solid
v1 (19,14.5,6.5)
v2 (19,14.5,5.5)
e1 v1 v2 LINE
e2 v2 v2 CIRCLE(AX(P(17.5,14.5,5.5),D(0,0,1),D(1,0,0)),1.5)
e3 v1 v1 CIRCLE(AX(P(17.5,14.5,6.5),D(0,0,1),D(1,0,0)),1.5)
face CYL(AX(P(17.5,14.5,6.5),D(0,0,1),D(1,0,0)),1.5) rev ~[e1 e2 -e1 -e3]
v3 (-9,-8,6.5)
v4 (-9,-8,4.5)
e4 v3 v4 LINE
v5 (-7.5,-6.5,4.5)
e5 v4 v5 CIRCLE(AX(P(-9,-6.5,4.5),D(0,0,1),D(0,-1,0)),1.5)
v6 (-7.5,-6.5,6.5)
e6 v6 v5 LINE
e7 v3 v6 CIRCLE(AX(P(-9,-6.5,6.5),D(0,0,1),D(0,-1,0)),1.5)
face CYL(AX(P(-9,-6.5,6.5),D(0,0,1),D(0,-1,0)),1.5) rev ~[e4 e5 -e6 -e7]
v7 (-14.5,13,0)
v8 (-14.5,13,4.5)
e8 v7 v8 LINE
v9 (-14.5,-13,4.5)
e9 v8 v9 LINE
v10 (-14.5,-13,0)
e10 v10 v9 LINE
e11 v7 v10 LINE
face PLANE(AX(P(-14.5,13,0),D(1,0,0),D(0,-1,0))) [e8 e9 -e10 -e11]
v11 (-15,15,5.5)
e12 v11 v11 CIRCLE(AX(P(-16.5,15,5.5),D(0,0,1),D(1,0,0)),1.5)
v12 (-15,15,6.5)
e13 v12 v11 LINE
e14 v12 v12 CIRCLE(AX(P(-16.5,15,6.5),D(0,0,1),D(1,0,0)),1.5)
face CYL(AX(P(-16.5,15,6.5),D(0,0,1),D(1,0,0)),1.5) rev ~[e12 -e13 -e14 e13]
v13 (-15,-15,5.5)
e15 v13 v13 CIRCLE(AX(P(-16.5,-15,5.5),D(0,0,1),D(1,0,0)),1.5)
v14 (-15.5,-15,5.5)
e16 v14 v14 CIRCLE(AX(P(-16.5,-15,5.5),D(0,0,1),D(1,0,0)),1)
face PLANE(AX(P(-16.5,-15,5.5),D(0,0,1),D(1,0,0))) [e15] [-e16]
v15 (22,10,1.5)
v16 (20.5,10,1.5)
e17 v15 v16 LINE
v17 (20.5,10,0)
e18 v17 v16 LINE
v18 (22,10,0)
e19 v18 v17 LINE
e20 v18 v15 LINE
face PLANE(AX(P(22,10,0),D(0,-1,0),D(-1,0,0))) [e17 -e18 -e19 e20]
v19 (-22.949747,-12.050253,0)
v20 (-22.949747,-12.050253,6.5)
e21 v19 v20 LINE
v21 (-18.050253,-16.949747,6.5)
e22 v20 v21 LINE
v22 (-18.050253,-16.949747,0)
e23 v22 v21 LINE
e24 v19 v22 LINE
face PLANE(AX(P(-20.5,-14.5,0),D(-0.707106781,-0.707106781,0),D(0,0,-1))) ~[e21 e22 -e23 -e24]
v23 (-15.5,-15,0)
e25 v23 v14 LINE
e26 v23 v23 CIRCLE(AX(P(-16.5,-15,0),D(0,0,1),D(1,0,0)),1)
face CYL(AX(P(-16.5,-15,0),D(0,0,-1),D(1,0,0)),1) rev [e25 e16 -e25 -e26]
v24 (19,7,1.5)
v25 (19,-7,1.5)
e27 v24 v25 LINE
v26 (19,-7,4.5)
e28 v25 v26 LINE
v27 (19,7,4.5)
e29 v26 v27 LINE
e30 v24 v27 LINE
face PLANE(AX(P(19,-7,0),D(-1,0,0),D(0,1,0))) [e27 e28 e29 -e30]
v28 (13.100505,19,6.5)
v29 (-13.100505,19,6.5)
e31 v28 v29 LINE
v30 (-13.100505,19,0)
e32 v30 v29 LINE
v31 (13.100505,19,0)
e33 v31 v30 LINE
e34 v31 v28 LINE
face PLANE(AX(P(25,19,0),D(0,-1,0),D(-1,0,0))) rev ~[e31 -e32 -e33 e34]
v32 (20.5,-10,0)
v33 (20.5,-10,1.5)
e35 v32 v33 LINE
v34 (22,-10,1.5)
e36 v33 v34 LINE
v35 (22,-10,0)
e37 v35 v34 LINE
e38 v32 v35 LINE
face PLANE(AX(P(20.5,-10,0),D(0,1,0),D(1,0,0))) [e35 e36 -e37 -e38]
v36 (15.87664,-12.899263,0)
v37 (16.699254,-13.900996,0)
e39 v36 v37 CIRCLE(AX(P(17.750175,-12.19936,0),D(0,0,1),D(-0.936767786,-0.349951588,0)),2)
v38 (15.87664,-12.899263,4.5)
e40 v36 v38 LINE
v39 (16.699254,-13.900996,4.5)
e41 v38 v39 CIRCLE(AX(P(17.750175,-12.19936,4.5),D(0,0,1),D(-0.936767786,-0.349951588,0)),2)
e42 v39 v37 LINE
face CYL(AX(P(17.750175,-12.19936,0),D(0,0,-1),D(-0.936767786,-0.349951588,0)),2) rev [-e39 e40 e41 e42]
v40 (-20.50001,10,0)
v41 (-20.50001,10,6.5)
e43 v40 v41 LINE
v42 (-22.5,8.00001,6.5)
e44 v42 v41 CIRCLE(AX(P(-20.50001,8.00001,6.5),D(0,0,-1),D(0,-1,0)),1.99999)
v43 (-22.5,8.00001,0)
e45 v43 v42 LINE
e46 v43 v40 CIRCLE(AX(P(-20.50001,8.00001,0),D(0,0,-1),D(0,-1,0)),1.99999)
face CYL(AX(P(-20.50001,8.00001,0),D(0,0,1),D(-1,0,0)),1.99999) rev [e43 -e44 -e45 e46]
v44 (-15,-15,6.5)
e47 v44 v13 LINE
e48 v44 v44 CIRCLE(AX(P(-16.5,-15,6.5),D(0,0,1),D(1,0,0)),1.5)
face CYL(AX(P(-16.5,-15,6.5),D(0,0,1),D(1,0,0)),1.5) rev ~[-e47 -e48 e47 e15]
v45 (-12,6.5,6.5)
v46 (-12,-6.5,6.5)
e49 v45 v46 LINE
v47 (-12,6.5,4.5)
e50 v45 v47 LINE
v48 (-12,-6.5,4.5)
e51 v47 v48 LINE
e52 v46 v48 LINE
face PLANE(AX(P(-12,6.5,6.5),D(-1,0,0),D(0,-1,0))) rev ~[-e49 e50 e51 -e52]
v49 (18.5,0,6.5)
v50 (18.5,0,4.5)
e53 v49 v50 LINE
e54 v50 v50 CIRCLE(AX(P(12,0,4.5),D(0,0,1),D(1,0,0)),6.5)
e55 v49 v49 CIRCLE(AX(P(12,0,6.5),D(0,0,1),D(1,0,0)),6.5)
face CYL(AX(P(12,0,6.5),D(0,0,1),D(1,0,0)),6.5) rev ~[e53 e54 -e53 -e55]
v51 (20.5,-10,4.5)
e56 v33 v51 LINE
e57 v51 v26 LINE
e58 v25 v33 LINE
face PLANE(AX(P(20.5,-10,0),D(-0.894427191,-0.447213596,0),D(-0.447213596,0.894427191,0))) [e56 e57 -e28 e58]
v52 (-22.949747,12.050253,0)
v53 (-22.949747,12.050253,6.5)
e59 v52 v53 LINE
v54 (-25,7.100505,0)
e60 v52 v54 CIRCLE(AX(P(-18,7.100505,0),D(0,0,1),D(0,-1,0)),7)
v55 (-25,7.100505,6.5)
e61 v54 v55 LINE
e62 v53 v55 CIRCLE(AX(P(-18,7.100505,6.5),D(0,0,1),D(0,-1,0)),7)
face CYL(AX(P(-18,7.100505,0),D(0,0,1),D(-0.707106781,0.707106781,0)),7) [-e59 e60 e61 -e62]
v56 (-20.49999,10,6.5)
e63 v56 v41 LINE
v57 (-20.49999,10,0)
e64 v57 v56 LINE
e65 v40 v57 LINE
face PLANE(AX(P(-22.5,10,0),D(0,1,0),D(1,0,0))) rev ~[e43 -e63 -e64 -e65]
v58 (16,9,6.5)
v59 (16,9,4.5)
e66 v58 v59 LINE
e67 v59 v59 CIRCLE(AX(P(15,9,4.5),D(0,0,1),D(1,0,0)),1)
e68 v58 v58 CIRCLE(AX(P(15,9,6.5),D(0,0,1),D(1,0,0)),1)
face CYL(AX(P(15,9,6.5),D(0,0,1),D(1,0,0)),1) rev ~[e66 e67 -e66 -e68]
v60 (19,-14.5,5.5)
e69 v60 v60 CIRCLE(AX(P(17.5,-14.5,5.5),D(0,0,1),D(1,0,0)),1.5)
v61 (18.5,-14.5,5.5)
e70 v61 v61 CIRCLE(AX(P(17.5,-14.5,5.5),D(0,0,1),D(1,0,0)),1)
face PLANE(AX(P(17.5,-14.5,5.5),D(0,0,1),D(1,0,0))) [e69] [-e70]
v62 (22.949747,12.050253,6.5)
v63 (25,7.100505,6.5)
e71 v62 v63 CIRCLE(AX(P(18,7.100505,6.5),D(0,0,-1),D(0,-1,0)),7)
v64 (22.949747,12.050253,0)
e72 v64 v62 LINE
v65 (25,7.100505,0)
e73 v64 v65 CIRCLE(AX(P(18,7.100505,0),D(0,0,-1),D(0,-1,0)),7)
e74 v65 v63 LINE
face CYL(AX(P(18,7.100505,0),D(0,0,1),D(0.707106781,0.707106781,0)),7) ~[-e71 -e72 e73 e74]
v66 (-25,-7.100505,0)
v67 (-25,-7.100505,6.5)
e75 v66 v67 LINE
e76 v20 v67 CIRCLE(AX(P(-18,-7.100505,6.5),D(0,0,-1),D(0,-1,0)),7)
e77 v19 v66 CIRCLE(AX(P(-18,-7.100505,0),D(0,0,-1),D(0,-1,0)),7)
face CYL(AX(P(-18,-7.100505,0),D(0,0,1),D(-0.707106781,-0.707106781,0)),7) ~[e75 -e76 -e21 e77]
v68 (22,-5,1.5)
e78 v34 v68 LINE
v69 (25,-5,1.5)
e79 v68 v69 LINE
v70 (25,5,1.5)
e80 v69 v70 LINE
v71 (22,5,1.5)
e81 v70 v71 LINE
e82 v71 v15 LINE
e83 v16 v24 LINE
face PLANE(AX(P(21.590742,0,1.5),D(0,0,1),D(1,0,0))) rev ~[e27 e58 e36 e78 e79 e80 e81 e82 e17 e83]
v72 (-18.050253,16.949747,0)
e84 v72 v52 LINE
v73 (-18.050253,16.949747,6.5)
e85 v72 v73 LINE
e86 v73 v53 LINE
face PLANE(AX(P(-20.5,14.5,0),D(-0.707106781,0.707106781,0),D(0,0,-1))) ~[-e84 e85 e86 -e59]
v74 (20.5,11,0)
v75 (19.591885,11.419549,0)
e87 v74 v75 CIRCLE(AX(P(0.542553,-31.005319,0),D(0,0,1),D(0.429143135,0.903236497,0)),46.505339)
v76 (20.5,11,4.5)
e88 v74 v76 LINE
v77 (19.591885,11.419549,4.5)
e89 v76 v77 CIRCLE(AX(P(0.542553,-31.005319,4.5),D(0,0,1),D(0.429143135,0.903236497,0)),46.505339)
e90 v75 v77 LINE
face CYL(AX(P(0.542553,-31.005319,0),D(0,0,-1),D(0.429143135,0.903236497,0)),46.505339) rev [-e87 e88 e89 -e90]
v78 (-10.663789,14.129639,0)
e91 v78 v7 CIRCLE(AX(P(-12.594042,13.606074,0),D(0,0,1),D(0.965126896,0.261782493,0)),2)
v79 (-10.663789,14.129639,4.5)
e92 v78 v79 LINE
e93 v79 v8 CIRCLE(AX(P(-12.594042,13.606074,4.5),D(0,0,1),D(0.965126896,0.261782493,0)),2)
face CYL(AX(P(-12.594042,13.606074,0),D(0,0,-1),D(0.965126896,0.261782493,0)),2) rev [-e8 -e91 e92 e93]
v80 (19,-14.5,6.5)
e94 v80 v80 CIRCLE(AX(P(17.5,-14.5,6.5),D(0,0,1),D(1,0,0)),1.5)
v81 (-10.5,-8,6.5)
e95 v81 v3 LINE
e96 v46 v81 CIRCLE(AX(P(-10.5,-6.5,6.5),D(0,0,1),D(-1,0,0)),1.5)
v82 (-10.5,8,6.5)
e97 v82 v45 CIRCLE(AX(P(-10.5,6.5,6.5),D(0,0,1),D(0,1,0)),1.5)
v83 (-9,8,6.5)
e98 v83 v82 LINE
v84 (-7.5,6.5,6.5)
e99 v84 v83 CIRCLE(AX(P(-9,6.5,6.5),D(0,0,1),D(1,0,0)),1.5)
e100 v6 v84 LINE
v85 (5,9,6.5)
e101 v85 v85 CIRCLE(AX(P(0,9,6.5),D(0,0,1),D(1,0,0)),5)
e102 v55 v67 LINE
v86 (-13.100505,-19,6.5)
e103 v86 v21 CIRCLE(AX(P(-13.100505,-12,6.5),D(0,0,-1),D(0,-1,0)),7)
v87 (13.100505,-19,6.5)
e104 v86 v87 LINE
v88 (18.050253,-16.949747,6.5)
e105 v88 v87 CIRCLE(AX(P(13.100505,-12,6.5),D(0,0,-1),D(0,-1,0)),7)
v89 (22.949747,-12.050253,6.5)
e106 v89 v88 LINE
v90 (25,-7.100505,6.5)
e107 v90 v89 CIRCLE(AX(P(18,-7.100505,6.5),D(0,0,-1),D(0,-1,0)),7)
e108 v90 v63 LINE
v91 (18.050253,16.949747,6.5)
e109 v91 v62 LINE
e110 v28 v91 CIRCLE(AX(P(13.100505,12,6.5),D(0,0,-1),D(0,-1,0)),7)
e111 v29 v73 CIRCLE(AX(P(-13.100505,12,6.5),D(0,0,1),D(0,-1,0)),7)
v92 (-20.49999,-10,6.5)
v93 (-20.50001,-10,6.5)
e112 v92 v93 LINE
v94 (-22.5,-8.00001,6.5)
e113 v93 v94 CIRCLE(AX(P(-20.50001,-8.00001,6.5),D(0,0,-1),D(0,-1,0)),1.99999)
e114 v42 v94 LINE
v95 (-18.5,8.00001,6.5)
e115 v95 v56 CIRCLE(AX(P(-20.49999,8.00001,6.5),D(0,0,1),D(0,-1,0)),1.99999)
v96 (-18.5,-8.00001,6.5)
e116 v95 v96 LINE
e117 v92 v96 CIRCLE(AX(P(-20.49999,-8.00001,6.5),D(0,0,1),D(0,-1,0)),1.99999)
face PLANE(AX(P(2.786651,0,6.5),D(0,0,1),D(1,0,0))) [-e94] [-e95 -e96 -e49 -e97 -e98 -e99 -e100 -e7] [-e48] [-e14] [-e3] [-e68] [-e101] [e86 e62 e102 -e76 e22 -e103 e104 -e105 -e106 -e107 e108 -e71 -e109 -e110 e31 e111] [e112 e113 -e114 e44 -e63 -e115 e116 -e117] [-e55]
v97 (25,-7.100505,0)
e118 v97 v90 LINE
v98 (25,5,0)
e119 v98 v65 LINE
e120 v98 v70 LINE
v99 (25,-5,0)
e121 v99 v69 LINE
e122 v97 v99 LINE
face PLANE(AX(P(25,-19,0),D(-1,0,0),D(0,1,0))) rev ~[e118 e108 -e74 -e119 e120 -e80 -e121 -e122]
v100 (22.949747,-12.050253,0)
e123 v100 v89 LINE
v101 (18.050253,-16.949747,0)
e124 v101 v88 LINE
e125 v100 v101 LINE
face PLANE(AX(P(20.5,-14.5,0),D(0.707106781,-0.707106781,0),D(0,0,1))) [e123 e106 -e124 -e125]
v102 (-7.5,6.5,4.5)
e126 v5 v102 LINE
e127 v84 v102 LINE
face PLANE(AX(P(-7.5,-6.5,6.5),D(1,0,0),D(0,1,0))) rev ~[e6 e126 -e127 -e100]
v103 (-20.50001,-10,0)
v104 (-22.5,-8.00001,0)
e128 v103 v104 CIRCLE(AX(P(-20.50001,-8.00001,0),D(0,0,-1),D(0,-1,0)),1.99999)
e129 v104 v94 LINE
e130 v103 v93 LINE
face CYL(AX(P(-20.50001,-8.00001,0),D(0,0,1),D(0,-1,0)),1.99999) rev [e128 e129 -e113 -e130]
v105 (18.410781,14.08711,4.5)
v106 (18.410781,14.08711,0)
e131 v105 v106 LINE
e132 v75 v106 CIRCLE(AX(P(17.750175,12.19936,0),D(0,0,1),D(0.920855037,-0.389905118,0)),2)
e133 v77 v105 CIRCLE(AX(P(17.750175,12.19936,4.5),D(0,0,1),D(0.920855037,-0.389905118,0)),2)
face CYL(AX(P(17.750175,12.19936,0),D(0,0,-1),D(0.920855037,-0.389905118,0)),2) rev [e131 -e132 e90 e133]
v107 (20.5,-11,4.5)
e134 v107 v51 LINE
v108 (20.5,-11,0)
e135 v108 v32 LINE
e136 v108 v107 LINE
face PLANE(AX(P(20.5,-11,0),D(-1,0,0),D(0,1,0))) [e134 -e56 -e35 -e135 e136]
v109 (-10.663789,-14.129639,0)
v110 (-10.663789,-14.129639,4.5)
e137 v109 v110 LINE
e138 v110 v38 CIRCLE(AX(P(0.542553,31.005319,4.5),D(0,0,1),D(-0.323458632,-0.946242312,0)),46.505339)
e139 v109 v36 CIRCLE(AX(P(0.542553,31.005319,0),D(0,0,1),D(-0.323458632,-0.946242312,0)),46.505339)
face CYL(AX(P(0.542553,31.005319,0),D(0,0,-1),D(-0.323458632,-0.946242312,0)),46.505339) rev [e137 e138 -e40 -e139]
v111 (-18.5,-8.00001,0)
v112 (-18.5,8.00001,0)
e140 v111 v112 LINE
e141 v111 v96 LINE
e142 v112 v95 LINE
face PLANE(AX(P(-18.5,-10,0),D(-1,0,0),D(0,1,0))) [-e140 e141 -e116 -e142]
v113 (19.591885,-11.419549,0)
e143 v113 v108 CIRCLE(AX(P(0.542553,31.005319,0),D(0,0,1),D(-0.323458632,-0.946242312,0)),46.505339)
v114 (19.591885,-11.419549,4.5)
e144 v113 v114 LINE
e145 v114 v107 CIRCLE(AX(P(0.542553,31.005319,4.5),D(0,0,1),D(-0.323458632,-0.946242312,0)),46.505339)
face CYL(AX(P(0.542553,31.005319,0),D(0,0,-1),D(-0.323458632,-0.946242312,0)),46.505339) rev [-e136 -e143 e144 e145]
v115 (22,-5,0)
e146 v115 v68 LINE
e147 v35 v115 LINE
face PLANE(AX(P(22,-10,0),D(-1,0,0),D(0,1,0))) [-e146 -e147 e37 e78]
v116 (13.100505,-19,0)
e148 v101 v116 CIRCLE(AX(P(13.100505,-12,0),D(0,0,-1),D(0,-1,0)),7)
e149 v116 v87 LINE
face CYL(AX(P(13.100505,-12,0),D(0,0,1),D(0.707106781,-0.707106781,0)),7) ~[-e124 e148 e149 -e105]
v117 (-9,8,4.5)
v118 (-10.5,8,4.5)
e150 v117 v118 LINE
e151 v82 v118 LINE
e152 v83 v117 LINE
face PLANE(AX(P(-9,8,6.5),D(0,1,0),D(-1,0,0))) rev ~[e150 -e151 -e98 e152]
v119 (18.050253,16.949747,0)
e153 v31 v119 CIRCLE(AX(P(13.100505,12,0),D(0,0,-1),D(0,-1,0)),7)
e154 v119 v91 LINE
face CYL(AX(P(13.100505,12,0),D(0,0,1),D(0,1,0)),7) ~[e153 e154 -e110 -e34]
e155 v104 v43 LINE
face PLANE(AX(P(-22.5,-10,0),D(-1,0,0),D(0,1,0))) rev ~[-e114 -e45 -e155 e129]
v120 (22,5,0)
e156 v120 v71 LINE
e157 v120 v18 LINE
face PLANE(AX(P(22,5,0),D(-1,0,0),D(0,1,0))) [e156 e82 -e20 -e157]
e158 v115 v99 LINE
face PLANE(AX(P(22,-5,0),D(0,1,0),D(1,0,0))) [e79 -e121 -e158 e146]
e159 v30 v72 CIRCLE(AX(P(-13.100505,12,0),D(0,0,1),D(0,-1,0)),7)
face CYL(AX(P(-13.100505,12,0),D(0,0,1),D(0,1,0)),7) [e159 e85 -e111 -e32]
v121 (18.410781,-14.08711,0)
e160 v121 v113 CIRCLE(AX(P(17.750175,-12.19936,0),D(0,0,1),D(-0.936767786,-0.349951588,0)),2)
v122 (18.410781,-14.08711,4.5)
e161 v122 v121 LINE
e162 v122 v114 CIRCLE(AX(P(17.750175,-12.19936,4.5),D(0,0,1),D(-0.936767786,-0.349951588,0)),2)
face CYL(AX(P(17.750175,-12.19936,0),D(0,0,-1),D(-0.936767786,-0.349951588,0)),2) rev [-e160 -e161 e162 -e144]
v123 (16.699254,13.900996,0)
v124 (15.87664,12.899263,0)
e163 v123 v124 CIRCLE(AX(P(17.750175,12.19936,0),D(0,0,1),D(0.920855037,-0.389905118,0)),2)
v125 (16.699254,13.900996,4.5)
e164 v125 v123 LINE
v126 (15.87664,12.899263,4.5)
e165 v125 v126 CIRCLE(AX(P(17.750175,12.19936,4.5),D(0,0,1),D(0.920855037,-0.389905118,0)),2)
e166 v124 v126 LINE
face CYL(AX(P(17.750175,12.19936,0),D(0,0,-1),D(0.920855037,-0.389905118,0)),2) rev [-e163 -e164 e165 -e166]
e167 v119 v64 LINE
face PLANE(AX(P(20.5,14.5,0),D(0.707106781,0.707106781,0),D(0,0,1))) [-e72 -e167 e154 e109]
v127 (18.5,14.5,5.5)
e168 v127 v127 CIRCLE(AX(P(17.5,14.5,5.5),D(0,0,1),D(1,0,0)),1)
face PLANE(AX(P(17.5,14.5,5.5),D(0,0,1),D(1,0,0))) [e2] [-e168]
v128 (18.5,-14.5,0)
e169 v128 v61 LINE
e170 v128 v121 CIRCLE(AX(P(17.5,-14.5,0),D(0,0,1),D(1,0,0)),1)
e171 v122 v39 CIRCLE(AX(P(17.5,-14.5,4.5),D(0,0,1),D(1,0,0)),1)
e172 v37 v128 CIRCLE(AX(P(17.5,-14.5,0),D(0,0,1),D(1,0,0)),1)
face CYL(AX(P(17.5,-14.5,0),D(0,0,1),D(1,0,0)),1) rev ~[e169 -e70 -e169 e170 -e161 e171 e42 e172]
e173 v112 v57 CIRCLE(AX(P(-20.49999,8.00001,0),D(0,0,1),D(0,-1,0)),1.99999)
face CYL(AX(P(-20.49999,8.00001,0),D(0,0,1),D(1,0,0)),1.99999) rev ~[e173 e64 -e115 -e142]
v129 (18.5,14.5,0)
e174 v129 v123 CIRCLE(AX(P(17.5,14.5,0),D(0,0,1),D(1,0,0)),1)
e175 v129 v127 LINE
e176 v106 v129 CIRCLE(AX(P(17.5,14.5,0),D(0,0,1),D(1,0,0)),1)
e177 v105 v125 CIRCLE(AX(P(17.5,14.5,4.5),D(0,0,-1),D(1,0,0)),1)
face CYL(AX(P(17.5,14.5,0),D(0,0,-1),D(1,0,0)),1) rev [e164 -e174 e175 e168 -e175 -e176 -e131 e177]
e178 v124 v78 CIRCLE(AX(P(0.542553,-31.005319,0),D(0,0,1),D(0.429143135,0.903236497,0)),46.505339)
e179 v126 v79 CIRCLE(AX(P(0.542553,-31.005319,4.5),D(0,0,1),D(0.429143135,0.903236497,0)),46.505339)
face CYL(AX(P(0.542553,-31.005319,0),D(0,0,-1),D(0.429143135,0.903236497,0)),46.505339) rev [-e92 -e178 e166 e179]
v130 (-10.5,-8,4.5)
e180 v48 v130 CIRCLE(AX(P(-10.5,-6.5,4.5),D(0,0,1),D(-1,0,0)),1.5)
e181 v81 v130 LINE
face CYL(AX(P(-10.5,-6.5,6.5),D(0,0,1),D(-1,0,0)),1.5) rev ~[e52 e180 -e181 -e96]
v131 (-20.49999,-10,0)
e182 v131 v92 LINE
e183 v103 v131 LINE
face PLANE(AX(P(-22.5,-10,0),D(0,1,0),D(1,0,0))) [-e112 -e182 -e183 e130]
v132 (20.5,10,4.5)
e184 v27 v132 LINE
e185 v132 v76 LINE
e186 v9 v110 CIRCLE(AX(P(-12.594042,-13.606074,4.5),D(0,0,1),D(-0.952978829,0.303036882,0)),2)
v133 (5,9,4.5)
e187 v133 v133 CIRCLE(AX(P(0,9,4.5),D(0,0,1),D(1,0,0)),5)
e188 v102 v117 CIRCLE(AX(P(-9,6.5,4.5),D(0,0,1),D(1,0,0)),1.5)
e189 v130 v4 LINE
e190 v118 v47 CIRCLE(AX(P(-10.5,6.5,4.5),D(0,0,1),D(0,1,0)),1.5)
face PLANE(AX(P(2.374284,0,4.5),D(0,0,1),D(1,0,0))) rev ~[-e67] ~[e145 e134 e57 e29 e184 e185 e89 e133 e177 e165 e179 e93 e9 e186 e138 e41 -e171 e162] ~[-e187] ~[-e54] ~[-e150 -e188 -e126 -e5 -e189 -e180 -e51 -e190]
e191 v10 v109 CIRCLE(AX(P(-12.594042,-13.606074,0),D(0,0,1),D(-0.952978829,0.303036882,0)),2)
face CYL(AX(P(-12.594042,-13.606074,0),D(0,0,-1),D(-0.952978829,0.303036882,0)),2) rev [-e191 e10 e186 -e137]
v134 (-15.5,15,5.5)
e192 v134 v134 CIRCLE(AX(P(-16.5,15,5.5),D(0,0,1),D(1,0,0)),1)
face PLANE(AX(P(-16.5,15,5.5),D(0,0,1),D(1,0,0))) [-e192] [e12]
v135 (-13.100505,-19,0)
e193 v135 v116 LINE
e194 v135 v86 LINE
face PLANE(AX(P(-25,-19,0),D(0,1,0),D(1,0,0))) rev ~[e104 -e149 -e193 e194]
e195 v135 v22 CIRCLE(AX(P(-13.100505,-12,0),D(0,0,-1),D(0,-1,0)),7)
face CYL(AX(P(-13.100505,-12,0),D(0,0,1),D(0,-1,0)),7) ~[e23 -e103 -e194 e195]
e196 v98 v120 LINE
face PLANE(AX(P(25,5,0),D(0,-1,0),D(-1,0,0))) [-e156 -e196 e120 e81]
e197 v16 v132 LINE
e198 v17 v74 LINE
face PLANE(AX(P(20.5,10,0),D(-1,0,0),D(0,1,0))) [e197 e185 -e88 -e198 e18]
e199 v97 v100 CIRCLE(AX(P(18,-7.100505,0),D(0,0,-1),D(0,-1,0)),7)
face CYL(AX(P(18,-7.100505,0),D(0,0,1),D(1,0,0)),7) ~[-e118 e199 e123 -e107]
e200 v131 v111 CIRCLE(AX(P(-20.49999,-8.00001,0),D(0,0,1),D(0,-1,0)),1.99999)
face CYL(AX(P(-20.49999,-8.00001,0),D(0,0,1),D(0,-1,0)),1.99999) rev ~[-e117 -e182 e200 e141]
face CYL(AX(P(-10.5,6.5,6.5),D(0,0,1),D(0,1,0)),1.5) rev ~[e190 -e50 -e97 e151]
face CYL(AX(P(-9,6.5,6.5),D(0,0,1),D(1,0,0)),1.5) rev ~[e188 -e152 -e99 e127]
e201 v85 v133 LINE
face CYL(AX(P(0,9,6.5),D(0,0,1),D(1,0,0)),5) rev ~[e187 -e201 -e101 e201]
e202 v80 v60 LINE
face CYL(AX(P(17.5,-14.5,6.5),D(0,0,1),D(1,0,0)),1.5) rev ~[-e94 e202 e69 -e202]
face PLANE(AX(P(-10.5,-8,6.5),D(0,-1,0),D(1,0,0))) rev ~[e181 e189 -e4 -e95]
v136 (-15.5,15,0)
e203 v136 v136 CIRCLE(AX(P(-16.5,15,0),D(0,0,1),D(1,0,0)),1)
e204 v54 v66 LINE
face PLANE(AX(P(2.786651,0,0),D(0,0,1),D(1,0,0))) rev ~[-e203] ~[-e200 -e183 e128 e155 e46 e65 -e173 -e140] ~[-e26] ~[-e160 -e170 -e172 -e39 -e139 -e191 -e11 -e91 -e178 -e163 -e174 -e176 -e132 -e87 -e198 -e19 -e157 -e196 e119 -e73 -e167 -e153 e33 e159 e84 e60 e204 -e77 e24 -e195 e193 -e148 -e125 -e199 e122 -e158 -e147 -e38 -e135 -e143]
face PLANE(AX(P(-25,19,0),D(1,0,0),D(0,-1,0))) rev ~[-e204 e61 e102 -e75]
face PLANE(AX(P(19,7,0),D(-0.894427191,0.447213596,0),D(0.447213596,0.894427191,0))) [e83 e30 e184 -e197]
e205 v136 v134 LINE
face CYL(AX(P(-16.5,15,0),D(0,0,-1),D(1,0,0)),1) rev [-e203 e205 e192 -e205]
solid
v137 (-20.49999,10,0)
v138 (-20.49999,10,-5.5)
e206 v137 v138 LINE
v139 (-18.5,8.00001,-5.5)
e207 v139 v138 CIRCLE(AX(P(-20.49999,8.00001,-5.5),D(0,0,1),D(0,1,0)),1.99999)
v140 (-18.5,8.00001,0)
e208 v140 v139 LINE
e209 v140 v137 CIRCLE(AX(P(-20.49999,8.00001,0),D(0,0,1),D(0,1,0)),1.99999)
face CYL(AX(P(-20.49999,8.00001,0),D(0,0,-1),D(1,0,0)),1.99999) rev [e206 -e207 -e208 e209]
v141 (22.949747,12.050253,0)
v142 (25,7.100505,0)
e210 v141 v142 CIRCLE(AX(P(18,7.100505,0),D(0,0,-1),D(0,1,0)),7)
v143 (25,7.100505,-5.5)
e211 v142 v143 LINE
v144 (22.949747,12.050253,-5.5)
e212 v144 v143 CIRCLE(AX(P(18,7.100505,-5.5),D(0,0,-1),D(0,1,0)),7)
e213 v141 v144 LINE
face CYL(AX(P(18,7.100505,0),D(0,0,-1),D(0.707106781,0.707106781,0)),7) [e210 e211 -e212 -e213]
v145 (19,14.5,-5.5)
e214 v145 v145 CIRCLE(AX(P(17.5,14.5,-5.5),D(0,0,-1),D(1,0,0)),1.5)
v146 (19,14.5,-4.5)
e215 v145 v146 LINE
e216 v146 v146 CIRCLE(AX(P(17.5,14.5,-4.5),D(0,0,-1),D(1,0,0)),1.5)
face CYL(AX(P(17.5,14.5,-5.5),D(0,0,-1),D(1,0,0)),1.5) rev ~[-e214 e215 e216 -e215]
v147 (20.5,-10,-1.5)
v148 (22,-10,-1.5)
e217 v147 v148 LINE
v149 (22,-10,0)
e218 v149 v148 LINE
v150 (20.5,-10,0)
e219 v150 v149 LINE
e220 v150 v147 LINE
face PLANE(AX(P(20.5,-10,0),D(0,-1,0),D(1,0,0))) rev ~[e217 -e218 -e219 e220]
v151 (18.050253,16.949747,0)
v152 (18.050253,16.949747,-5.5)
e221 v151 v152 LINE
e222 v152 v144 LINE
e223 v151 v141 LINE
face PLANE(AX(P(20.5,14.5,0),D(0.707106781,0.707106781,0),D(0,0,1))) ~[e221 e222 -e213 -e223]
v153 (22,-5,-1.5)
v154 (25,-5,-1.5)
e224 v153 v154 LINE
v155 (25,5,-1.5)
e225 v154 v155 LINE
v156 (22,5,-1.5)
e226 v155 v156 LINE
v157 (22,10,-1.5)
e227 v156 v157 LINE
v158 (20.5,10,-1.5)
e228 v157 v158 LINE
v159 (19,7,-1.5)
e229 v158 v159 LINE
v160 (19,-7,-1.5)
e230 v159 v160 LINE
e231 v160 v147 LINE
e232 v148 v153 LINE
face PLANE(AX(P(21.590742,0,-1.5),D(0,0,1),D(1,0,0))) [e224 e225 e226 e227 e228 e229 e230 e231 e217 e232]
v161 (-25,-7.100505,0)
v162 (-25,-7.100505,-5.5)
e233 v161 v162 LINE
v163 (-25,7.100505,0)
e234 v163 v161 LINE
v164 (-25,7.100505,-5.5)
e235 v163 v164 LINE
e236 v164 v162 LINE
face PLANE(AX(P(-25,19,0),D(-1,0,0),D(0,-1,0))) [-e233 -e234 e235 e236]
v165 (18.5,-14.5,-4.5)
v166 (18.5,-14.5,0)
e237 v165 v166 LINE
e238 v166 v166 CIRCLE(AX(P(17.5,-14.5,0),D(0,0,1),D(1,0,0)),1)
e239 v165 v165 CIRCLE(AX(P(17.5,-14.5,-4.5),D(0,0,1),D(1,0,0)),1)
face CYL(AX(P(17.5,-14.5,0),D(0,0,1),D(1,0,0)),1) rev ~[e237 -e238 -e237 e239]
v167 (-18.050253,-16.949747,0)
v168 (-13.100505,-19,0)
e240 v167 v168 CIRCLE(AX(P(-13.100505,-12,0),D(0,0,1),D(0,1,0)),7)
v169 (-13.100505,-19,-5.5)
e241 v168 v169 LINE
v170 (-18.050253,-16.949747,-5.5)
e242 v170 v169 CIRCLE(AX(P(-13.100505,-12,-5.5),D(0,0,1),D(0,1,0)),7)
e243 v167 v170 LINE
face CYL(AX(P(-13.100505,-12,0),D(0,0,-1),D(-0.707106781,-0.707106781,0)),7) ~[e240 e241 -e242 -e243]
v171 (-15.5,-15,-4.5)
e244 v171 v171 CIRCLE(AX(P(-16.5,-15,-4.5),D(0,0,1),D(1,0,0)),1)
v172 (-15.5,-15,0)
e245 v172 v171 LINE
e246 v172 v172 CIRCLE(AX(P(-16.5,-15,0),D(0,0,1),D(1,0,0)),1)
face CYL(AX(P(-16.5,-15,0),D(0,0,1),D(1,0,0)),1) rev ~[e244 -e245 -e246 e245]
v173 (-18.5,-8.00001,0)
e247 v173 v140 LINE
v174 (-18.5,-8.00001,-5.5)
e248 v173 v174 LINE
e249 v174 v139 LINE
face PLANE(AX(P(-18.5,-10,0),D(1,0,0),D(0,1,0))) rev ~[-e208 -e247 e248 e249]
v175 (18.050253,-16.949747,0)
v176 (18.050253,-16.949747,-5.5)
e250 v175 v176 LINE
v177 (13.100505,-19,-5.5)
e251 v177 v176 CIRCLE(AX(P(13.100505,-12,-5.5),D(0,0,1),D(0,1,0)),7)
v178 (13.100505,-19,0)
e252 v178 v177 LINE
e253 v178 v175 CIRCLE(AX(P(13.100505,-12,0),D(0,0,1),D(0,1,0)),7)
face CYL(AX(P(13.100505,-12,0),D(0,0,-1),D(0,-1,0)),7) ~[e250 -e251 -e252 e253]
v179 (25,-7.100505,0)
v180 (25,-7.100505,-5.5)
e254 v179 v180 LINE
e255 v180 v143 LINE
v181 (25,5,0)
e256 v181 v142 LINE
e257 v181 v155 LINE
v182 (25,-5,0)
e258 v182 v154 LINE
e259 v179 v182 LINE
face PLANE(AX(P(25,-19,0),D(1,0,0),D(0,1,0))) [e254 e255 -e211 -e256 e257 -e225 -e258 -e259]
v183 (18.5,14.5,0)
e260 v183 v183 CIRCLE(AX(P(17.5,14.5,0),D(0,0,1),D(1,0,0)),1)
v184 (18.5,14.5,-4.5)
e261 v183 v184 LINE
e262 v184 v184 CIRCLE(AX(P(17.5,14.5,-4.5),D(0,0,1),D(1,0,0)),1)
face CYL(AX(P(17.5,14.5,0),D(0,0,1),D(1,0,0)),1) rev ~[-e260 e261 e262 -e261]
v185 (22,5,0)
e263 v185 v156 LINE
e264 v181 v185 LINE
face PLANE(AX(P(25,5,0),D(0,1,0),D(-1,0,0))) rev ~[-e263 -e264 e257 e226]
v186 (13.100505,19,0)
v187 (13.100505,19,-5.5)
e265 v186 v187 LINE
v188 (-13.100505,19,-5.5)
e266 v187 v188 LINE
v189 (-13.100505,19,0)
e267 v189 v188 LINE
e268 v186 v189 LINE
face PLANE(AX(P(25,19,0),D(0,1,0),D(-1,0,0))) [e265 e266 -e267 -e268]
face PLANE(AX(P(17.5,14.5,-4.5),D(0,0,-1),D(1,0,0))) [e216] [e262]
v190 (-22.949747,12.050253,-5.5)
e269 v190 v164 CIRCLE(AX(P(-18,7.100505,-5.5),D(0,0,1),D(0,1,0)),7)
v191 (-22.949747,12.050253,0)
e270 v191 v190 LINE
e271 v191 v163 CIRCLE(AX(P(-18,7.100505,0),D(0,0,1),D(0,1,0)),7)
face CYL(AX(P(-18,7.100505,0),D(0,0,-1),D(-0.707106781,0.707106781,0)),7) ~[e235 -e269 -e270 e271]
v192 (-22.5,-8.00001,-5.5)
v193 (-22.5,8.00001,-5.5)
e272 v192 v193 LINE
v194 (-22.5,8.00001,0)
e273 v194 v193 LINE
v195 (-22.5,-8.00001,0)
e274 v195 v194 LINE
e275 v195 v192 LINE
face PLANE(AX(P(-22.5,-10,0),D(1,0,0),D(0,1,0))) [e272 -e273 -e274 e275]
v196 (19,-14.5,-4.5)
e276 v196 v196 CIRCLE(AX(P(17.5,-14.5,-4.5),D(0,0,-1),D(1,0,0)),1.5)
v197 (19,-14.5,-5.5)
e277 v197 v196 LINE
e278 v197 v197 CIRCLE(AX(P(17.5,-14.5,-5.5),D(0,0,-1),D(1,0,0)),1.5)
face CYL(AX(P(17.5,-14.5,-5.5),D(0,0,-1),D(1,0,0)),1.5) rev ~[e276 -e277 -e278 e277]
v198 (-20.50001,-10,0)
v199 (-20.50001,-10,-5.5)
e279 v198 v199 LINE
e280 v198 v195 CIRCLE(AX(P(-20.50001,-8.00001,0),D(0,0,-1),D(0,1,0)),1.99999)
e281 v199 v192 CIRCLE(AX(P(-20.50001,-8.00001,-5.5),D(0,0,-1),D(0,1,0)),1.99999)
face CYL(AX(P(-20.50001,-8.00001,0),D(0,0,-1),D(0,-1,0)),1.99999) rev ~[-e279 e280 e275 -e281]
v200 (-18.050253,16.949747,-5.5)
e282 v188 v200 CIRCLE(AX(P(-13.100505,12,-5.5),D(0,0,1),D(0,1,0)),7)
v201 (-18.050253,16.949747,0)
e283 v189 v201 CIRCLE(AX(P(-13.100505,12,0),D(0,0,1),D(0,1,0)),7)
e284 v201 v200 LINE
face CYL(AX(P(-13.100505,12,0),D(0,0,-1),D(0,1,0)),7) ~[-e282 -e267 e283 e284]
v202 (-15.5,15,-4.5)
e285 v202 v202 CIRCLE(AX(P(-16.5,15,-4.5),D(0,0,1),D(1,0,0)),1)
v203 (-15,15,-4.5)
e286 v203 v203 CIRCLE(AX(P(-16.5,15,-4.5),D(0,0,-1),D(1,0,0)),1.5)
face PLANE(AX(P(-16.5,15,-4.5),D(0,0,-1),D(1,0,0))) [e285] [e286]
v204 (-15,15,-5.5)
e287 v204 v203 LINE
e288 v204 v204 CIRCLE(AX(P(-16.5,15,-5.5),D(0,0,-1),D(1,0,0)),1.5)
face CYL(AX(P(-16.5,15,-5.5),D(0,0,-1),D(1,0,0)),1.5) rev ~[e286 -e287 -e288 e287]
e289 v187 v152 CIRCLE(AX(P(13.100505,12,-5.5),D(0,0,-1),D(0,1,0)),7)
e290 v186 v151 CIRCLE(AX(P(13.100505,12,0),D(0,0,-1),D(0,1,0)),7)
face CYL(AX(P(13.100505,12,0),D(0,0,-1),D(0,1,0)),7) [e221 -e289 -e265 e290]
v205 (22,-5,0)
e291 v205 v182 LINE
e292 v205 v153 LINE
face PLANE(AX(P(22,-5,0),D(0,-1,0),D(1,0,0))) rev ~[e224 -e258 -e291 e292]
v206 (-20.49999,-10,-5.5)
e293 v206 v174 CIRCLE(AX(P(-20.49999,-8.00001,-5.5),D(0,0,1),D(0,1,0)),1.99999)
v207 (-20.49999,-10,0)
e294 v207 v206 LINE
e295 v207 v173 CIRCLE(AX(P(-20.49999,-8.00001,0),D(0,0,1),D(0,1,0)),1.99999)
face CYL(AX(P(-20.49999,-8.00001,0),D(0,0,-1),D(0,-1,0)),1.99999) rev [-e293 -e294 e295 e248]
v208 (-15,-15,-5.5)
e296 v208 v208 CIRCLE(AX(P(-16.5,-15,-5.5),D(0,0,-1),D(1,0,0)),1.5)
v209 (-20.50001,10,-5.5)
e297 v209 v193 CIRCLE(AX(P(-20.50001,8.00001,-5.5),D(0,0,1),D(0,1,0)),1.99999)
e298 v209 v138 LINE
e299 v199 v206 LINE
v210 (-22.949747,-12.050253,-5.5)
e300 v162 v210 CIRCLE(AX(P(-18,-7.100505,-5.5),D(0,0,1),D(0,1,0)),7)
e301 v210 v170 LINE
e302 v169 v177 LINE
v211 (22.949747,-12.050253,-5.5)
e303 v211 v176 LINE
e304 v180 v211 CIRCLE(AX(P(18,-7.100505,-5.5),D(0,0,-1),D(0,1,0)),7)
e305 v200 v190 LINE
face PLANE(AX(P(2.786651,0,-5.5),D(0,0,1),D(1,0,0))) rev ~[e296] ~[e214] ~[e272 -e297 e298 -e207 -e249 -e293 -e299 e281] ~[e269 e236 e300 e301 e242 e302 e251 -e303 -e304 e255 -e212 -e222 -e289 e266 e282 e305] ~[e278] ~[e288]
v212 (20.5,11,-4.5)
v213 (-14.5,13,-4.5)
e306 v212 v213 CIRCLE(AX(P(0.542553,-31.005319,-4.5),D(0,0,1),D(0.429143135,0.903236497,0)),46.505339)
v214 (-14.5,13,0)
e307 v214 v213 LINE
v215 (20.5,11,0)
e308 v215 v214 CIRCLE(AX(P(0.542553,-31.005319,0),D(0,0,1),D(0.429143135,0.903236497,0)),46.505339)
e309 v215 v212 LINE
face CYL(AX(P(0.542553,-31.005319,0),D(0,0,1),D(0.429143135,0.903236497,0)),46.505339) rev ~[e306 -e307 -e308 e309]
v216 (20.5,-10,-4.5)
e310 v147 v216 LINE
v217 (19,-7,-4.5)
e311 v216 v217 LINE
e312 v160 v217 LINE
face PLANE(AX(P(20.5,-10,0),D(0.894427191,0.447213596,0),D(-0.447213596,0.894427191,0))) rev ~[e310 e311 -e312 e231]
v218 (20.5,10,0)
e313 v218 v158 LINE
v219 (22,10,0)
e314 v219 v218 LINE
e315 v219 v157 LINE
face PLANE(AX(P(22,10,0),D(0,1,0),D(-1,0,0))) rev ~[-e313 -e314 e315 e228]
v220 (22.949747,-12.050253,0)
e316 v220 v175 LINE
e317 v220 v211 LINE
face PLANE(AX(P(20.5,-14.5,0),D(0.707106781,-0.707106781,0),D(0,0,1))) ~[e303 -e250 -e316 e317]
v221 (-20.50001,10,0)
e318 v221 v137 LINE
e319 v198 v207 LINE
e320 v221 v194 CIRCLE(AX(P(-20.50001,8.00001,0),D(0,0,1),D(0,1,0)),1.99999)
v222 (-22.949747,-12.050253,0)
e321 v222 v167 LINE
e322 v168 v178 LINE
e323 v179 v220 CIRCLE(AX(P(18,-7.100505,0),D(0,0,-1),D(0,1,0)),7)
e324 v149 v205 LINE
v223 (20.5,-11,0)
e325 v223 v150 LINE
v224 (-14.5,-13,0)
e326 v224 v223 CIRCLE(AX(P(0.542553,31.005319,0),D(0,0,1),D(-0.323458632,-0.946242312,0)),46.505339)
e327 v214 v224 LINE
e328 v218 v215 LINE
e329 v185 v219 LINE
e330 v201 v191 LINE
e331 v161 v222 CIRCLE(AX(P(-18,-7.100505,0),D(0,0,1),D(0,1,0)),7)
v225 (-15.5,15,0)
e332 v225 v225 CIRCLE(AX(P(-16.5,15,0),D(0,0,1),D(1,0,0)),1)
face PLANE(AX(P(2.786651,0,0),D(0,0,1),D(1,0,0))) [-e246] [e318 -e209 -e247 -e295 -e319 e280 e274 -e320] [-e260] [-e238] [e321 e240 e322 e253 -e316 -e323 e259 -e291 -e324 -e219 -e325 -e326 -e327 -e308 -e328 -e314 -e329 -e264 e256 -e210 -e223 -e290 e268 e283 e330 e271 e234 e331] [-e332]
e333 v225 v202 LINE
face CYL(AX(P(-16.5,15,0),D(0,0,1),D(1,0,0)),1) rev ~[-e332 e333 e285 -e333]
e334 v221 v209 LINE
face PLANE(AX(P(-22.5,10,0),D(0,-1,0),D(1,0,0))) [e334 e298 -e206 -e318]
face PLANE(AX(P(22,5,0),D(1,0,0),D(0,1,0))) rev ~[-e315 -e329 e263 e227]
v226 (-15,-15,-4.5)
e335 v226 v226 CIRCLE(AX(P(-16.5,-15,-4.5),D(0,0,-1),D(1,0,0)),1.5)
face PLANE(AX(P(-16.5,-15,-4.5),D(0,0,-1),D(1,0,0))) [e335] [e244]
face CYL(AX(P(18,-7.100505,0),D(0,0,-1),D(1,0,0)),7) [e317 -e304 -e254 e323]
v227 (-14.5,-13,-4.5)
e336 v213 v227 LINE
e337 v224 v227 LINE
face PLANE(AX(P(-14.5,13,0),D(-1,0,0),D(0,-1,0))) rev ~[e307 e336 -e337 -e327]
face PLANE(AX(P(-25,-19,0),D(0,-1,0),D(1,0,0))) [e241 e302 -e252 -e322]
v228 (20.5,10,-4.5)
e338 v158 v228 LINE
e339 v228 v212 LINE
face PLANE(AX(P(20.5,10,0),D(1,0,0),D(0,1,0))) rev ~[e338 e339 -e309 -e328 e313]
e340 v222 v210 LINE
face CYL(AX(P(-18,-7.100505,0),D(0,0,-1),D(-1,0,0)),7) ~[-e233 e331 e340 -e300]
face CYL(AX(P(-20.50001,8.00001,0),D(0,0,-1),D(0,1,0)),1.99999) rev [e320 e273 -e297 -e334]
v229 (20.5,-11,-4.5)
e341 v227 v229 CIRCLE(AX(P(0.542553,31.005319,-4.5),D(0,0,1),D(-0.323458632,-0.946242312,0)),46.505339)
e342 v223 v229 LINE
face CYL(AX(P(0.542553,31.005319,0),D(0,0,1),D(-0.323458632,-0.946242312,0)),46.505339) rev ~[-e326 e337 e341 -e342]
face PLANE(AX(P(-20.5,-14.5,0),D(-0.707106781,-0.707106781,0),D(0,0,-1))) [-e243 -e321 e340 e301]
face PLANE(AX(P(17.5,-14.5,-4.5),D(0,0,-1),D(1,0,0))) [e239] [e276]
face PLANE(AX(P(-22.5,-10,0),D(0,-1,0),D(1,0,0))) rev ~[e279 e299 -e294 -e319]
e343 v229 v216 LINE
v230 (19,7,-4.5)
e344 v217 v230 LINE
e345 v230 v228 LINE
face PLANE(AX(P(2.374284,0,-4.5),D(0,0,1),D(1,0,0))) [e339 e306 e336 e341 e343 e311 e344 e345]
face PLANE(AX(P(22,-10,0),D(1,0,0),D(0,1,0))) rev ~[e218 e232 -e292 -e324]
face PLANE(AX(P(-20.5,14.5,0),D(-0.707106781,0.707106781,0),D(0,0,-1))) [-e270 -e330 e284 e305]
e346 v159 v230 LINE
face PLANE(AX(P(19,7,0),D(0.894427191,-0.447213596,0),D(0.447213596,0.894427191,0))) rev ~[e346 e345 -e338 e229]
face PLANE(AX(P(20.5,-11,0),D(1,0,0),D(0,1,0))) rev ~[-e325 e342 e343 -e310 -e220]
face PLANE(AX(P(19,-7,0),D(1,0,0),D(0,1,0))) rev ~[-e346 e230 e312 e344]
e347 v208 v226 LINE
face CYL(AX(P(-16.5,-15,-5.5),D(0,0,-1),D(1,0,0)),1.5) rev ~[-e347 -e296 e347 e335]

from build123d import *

# Parameters (mm, degrees)
F1_DEPTH   = 5.5
F2_DEPTH   = 1.5
F4_DEPTH   = 4.5
F5_W       = 4
F5_H       = 20
F6_DEPTH   = 25
F7_DEPTH   = 6.5
F8_DEPTH   = 1.5
F9_DEPTH   = 4.5
F10_DEPTH  = 25
F11_R      = 5
F11_R_2    = 6.5
F11_R_3    = 1
F12_DEPTH  = 4
F14_DEPTH  = 4.5
F15_SIZE   = 9
F15_2_SIZE = 9
F16_R      = 7
F16_2_R    = 7
F17_R      = 1.99999
F17_2_R    = 1.99999
F18_R      = 1
F19_DEPTH  = 7.5
F20_R      = 1.5
F20_R_2    = 1
F21_DEPTH  = 1
F22_R      = 1.5
F23_DEPTH  = 1


# Not quite as in the source:
# - a fillet or chamfer is up to 0.001 mm smaller than in the source, because OpenCascade refuses the exact size


with BuildPart() as f1:
    # F0 (on Top) → F1 (new body)
    with BuildSketch(Plane.XY):
        Polygon((25, 5), (25, 19), (-25, 19), (-25, -19), (25, -19), (25, -5), (22, -5), (22, -10), (20.5, -10), (19, -7), (19, 7), (20.5, 10), (22, 10), (22, 5), align=None)
        Polygon((25, -5), (25, 5), (22, 5), (22, 10), (20.5, 10), (19, 7), (19, -7), (20.5, -10), (22, -10), (22, -5), align=None)
    extrude(amount=-F1_DEPTH)

    # F0 (on Top) → F2 (cut)
    with BuildSketch(Plane.XY):
        Polygon((25, -5), (25, 5), (22, 5), (22, 10), (20.5, 10), (19, 7), (19, -7), (20.5, -10), (22, -10), (22, -5), align=None)
    extrude(amount=-F2_DEPTH, mode=Mode.SUBTRACT)

    # F3 (on face) → F4 (cut)
    with BuildSketch(Plane.XY):
        with BuildLine():
            Line((19, 7), (20.5, 10))
            Line((20.5, 10), (20.5, 11))
            ThreePointArc((20.5, 11), (3.1956730185, 15.4242778244), (-14.5, 13))
            Line((-14.5, 13), (-14.5, 0))
            Line((-14.5, 0), (-14.5, -13))
            ThreePointArc((-14.5, -13), (3.1956730185, -15.4242778244), (20.5, -11))
            Line((20.5, -11), (20.5, -10))
            Line((20.5, -10), (19, -7))
            Line((19, -7), (19, 7))
        make_face()
    extrude(amount=-F4_DEPTH, mode=Mode.SUBTRACT)

    # F5 (on face) → F6 (cut)
    with BuildSketch(Plane.XY):
        with Locations((-20.5, 0)):
            Rectangle(F5_W, F5_H)
    extrude(amount=-F6_DEPTH, mode=Mode.SUBTRACT)

    # F15#2
    f15_2_edges = [f1.edges().sort_by_distance(p)[0] for p in [
        (25, -19, -2.75),
        (25, 19, -2.75),
        (-25, -19, -2.75),
        (-25, 19, -2.75),
    ]]
    chamfer(f15_2_edges, length=F15_2_SIZE)

    # F16#2
    f16_2_edges = [f1.edges().sort_by_distance(p)[0] for p in [
        (16, -19, -2.75),
        (25, -10, -2.75),
        (25, 10, -2.75),
        (16, 19, -2.75),
        (-16, -19, -2.75),
        (-25, -10, -2.75),
        (-25, 10, -2.75),
        (-16, 19, -2.75),
    ]]
    fillet(f16_2_edges, radius=F16_2_R)

    # F17 (radius 2 in the source; OpenCascade refuses exactly that, so slightly less here)
    f17_edges = [f1.edges().sort_by_distance(p)[0] for p in [
        (-22.5, 10, -2.75),
        (-22.5, -10, -2.75),
        (-18.5, 10, -2.75),
        (-18.5, -10, -2.75),
    ]]
    fillet(f17_edges, radius=F17_R)


with BuildPart() as f7:
    # F0 (on Top) → F7 (new body)
    with BuildSketch(Plane.XY):
        Polygon((25, 5), (25, 19), (-25, 19), (-25, -19), (25, -19), (25, -5), (22, -5), (22, -10), (20.5, -10), (19, -7), (19, 7), (20.5, 10), (22, 10), (22, 5), align=None)
        Polygon((25, -5), (25, 5), (22, 5), (22, 10), (20.5, 10), (19, 7), (19, -7), (20.5, -10), (22, -10), (22, -5), align=None)
    extrude(amount=F7_DEPTH)

    # F0 (on Top) → F8 (cut)
    with BuildSketch(Plane.XY):
        Polygon((25, -5), (25, 5), (22, 5), (22, 10), (20.5, 10), (19, 7), (19, -7), (20.5, -10), (22, -10), (22, -5), align=None)
    extrude(amount=F8_DEPTH, mode=Mode.SUBTRACT)

    # F3 (on face) → F9 (cut)
    with BuildSketch(Plane.XY):
        with BuildLine():
            Line((19, 7), (20.5, 10))
            Line((20.5, 10), (20.5, 11))
            ThreePointArc((20.5, 11), (3.1956730185, 15.4242778244), (-14.5, 13))
            Line((-14.5, 13), (-14.5, 0))
            Line((-14.5, 0), (-14.5, -13))
            ThreePointArc((-14.5, -13), (3.1956730185, -15.4242778244), (20.5, -11))
            Line((20.5, -11), (20.5, -10))
            Line((20.5, -10), (19, -7))
            Line((19, -7), (19, 7))
        make_face()
    extrude(amount=F9_DEPTH, mode=Mode.SUBTRACT)

    # F5 (on face) → F10 (cut)
    with BuildSketch(Plane.XY):
        with Locations((-20.5, 0)):
            Rectangle(F5_W, F5_H)
    extrude(amount=F10_DEPTH, mode=Mode.SUBTRACT)

    # F11 (on face) → F12 (cut)
    with BuildSketch(Plane.XY.offset(6.5)):
        with Locations((0, 9)):
            Circle(F11_R)
        with BuildLine():
            ThreePointArc((-7.5, 6.5), (-7.9393398282, 7.5606601718), (-9, 8))
            Line((-9, 8), (-10.5, 8))
            ThreePointArc((-10.5, 8), (-11.5606601718, 7.5606601718), (-12, 6.5))
            Line((-12, 6.5), (-12, -6.5))
            ThreePointArc((-12, -6.5), (-11.5606601718, -7.5606601718), (-10.5, -8))
            Line((-10.5, -8), (-9, -8))
            ThreePointArc((-9, -8), (-7.9393398282, -7.5606601718), (-7.5, -6.5))
            Line((-7.5, -6.5), (-7.5, 6.5))
        make_face()
        with Locations((12, 0)):
            Circle(F11_R_2)
        with Locations((15, 9)):
            Circle(F11_R_3)
    extrude(amount=-F12_DEPTH, mode=Mode.SUBTRACT)

    # F13 (on face) → F14 (cut)
    with BuildSketch(Plane.XY):
        with BuildLine():
            Line((-10.6637885499, -14.1296387517), (-14.5, -13))
            ThreePointArc((-14.5, -13), (-12.5940423426, -13.6060737647), (-10.6637885499, -14.1296387517))
        make_face()
        with BuildLine():
            ThreePointArc((-10.6637885499, -14.1296387517), (-12.5940423426, -13.6060737647), (-14.5, -13))
            ThreePointArc((-14.5, -13), (-13.158992343, -15.5246230857), (-10.6637885499, -14.1296387517))
        make_face()
        with BuildLine():
            Line((19.5918852505, -11.4195493603), (15.8766396041, -12.8992627738))
            ThreePointArc((15.8766396041, -12.8992627738), (17.7501751769, -12.1993595968), (19.5918852505, -11.4195493603))
        make_face()
        with BuildLine():
            ThreePointArc((19.5918852505, -11.4195493603), (17.7501751769, -12.1993595968), (15.8766396041, -12.8992627738))
            ThreePointArc((15.8766396041, -12.8992627738), (18.4902029887, -14.0574120282), (19.5918852505, -11.4195493603))
        make_face()
        with BuildLine():
            Line((15.8766396041, 12.8992627738), (19.5918852505, 11.4195493603))
            ThreePointArc((19.5918852505, 11.4195493603), (17.7501751769, 12.1993595968), (15.8766396041, 12.8992627738))
        make_face()
        with BuildLine():
            ThreePointArc((15.8766396041, 12.8992627738), (17.7501751769, 12.1993595968), (19.5918852505, 11.4195493603))
            ThreePointArc((19.5918852505, 11.4195493603), (18.4902029887, 14.0574120282), (15.8766396041, 12.8992627738))
        make_face()
        with BuildLine():
            Line((-14.5, 13), (-10.6637885499, 14.1296387517))
            ThreePointArc((-10.6637885499, 14.1296387517), (-12.5940423426, 13.6060737647), (-14.5, 13))
        make_face()
        with BuildLine():
            ThreePointArc((-14.5, 13), (-12.5940423426, 13.6060737647), (-10.6637885499, 14.1296387517))
            ThreePointArc((-10.6637885499, 14.1296387517), (-13.158992343, 15.5246230857), (-14.5, 13))
        make_face()
    extrude(amount=F14_DEPTH, mode=Mode.SUBTRACT)

    # F15
    f15_edges = [f7.edges().sort_by_distance(p)[0] for p in [
        (25, -19, 3.25),
        (25, 19, 3.25),
        (-25, -19, 3.25),
        (-25, 19, 3.25),
    ]]
    chamfer(f15_edges, length=F15_SIZE)

    # F16
    f16_edges = [f7.edges().sort_by_distance(p)[0] for p in [
        (16, -19, 3.25),
        (25, -10, 3.25),
        (25, 10, 3.25),
        (16, 19, 3.25),
        (-16, -19, 3.25),
        (-25, -10, 3.25),
        (-25, 10, 3.25),
        (-16, 19, 3.25),
    ]]
    fillet(f16_edges, radius=F16_R)

    # F17#2 (radius 2 in the source; OpenCascade refuses exactly that, so slightly less here)
    f17_2_edges = [f7.edges().sort_by_distance(p)[0] for p in [
        (-22.5, 10, 3.25),
        (-22.5, -10, 3.25),
        (-18.5, 10, 3.25),
        (-18.5, -10, 3.25),
    ]]
    fillet(f17_2_edges, radius=F17_2_R)


with BuildPart() as f19_tool:
    # F18 (on face) → F19 (new body, symmetric)
    with BuildSketch(Plane.XY):
        with Locations((17.5, 14.5)):
            Circle(F18_R)
        with Locations((-16.5, 15)):
            Circle(F18_R)
        with Locations((-16.5, -15)):
            Circle(F18_R)
        with Locations((17.5, -14.5)):
            Circle(F18_R)
    extrude(amount=F19_DEPTH, both=True)


with BuildPart() as f1_1:
    add(f1.part)

    # F19: cut by f19_tool
    add(f19_tool.part, mode=Mode.SUBTRACT)

    # F22 (on face) → F23 (cut)
    with BuildSketch(Plane(origin=(0, 0, -5.5), x_dir=(1, 0, 0), z_dir=(0, 0, -1))):
        with Locations((-16.5, 15)):
            Circle(F22_R)
        with Locations((17.5, 14.5)):
            Circle(F22_R)
        with Locations((-16.5, -15)):
            Circle(F22_R)
        with Locations((17.5, -14.5)):
            Circle(F22_R)
    extrude(amount=-F23_DEPTH, mode=Mode.SUBTRACT)


with BuildPart() as f7_1:
    add(f7.part)

    # F19: cut by f19_tool
    add(f19_tool.part, mode=Mode.SUBTRACT)

    # F20 (on face) → F21 (cut)
    with BuildSketch(Plane.XY.offset(6.5)):
        with Locations((-16.5, -15)):
            Circle(F20_R)
        with Locations((-16.5, -15)):
            Circle(F20_R_2, mode=Mode.SUBTRACT)
        with Locations((-16.5, 15)):
            Circle(F20_R)
        with Locations((-16.5, 15)):
            Circle(F20_R_2, mode=Mode.SUBTRACT)
        with Locations((17.5, 14.5)):
            Circle(F20_R)
        with Locations((17.5, 14.5)):
            Circle(F20_R_2, mode=Mode.SUBTRACT)
        with Locations((17.5, -14.5)):
            Circle(F20_R)
        with Locations((17.5, -14.5)):
            Circle(F20_R_2, mode=Mode.SUBTRACT)
    extrude(amount=-F21_DEPTH, mode=Mode.SUBTRACT)


solid = Compound([f1_1.part, f7_1.part])
